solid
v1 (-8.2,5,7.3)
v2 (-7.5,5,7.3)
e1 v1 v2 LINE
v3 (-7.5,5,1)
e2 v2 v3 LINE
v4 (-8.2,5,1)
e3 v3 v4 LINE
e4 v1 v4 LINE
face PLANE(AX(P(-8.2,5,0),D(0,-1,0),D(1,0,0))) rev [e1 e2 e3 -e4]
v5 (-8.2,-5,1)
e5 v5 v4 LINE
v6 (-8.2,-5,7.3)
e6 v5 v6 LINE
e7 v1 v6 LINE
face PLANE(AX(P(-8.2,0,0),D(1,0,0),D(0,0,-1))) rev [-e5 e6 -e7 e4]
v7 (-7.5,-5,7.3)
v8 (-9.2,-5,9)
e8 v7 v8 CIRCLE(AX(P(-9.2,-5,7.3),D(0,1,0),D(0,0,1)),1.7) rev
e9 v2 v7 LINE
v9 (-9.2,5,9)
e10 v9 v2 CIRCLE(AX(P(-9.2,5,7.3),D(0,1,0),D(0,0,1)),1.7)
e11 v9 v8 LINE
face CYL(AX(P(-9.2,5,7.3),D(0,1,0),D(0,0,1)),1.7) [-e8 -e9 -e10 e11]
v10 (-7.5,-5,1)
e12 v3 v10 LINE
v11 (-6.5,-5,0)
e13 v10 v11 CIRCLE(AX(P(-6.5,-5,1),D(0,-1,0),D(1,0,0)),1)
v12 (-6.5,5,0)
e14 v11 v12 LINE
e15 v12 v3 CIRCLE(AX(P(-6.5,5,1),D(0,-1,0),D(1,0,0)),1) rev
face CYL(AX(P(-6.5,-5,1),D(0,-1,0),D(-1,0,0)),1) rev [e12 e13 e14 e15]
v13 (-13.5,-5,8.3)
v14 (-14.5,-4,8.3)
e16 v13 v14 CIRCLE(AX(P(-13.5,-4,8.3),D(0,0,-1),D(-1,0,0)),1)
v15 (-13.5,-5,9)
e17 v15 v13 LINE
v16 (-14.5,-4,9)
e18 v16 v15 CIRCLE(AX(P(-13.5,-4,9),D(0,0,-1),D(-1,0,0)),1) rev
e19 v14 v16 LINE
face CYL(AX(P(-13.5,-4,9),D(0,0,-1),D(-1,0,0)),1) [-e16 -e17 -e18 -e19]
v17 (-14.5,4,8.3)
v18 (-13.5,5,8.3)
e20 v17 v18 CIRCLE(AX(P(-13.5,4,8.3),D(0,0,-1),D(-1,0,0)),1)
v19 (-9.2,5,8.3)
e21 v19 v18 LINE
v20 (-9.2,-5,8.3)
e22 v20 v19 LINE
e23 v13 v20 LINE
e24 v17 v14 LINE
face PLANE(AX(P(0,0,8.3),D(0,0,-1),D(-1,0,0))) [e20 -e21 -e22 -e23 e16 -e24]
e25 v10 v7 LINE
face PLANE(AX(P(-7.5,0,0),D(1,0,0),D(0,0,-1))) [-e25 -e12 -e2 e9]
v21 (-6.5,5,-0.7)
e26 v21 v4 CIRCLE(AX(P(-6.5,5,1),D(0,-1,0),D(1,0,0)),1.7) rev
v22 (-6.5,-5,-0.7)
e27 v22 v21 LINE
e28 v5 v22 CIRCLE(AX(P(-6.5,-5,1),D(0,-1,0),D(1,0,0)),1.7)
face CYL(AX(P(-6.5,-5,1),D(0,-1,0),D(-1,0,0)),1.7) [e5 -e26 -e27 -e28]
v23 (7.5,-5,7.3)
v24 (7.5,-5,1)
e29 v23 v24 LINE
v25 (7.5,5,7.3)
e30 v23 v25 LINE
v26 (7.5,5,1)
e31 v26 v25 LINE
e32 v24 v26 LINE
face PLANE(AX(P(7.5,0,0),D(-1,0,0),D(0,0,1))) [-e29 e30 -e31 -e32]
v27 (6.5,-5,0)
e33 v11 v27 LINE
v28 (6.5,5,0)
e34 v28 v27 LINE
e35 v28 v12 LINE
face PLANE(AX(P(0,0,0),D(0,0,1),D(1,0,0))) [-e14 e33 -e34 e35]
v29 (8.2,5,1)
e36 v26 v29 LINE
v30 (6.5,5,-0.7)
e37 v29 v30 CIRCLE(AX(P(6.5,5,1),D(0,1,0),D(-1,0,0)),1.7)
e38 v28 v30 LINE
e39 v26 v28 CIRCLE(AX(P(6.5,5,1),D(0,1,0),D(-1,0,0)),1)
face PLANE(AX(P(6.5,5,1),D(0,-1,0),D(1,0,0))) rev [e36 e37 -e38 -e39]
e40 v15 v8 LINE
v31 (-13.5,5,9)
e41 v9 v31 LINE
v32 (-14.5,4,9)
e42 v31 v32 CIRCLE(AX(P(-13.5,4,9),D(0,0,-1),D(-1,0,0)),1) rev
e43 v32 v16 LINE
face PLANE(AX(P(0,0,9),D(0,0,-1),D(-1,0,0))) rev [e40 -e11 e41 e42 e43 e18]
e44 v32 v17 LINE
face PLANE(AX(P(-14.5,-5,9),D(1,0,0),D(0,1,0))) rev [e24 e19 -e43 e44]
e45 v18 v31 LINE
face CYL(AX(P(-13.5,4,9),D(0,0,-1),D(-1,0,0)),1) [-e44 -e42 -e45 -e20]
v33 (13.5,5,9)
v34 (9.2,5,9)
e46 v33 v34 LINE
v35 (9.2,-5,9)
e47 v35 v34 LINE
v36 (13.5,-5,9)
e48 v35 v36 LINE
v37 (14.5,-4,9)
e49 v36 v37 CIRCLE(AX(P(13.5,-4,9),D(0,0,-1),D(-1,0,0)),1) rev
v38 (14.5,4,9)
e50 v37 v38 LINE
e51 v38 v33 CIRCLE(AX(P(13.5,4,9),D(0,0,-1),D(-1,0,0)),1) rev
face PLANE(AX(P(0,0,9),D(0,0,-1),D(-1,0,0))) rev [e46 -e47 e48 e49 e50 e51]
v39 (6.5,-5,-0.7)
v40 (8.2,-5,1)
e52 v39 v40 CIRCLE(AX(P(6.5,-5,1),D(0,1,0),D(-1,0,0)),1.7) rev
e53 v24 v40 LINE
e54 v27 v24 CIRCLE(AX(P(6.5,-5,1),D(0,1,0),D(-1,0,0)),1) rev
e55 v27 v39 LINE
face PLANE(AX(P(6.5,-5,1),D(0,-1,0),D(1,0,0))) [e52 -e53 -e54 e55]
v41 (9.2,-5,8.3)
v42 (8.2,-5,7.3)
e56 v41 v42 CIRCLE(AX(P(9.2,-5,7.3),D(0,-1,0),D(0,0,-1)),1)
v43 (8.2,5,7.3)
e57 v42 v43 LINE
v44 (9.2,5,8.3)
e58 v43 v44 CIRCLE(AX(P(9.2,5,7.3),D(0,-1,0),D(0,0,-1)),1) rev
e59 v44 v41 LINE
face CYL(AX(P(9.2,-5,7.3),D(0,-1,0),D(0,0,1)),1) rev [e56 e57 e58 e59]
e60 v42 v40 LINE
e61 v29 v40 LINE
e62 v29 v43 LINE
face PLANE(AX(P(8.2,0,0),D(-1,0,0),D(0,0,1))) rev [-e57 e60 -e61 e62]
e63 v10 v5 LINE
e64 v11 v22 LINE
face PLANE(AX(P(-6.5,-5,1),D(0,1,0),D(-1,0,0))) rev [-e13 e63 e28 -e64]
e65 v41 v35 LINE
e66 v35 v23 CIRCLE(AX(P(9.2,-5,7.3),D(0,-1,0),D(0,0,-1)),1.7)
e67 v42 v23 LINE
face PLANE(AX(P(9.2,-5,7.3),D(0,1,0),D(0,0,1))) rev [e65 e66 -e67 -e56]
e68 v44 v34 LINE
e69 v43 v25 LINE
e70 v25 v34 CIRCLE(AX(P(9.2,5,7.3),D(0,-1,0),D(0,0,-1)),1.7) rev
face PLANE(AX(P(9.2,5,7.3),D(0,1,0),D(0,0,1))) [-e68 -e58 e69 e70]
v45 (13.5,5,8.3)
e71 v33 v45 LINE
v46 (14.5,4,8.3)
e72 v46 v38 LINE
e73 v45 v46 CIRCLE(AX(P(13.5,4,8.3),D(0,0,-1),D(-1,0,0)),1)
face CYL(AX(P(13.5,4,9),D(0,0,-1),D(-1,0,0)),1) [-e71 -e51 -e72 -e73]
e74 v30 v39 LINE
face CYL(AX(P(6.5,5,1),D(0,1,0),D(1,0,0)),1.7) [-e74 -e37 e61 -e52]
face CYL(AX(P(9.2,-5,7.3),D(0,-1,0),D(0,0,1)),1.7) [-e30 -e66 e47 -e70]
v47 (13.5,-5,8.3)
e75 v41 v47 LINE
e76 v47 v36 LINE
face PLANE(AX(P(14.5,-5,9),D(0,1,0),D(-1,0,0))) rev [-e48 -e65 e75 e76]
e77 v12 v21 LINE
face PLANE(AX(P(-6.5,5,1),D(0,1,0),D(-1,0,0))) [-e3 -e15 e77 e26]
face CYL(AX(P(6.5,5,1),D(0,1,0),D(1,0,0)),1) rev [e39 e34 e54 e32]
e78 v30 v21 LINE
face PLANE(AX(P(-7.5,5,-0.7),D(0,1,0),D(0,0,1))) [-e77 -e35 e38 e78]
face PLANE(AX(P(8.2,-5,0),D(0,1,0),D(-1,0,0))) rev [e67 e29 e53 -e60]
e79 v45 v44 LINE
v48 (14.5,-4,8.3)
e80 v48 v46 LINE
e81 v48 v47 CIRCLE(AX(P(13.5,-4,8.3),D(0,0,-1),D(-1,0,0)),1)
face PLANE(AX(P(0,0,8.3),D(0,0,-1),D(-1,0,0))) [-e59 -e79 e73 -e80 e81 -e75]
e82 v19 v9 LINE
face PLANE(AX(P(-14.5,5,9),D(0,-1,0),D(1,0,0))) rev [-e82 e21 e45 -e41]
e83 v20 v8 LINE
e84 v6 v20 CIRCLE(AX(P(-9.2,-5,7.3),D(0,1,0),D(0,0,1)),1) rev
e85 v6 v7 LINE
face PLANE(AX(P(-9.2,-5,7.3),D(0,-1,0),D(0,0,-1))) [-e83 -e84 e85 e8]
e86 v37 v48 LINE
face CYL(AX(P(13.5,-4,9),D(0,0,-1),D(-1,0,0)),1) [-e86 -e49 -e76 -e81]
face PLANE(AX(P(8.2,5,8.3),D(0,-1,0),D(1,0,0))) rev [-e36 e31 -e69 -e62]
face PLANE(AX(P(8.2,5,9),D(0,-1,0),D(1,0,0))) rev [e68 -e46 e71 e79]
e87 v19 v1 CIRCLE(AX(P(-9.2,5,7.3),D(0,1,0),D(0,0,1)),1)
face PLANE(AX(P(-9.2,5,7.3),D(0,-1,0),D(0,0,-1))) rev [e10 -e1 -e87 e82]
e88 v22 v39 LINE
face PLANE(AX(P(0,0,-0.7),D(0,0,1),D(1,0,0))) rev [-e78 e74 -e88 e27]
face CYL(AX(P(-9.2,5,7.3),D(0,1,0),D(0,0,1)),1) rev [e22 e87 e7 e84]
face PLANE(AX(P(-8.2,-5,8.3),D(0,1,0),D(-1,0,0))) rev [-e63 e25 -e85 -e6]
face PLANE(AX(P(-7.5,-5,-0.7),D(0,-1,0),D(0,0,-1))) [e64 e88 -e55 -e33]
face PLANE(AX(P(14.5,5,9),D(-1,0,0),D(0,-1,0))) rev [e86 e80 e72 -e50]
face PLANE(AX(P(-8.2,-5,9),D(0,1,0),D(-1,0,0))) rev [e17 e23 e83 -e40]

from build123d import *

# Parameters (mm, degrees)
SKETCH2_W                    = 15
SKETCH2_H                    = 10
BASE_FLANGE1_DEPTH           = 0.7
EDGE_FLANGE1_STRIP_W         = 4.8
EDGE_FLANGE1_STRIP_H         = 0.7
EDGE_FLANGE1_STRIP_CUT_DEPTH = 10
EDGE_FLANGE1_DEPTH           = 10
EDGE_FLANGE2_STRIP_W         = 4.8
EDGE_FLANGE2_STRIP_H         = 0.7
EDGE_FLANGE2_STRIP_CUT_DEPTH = 10
EDGE_FLANGE2_DEPTH           = 10
EDGE_FLANGE3_STRIP_W         = 4.8
EDGE_FLANGE3_STRIP_H         = 0.7
EDGE_FLANGE3_STRIP_CUT_DEPTH = 10
EDGE_FLANGE3_DEPTH           = 10
EDGE_FLANGE4_STRIP_W         = 4.8
EDGE_FLANGE4_STRIP_H         = 0.7
EDGE_FLANGE4_STRIP_CUT_DEPTH = 10
EDGE_FLANGE4_DEPTH           = 10
FILLET1_R                    = 1


# Sheet-metal steps are written as plain solids
with BuildPart() as part:
    # Sketch2 → Base-Flange1 (new body)
    with BuildSketch(Plane.XY):
        Rectangle(SKETCH2_W, SKETCH2_H)
    extrude(amount=-BASE_FLANGE1_DEPTH)

    # Edge-Flange1 strip (across the edge) → Edge-Flange1 strip cut (cut)
    with BuildSketch(Plane(origin=(-7.5, 5, 0), x_dir=(1, 0, 0), z_dir=(0, -1, 0))):
        with Locations((-1.4, -0.35)):
            Rectangle(EDGE_FLANGE1_STRIP_W, EDGE_FLANGE1_STRIP_H)
    extrude(amount=EDGE_FLANGE1_STRIP_CUT_DEPTH, mode=Mode.SUBTRACT)

    # Edge-Flange1 section (across the edge) → Edge-Flange1 (add)
    with BuildSketch(Plane(origin=(-7.5, 5, 0), x_dir=(1, 0, 0), z_dir=(0, -1, 0))):
        with BuildLine():
            Line((-0.7, 1), (-0.7, 8.3))
            Line((-0.7, 8.3), (0, 8.3))
            Line((0, 8.3), (0, 1))
            ThreePointArc((0, 1), (0.292893219, 0.292893219), (1, 0))
            Line((1, 0), (1, -0.7))
            ThreePointArc((1, -0.7), (-0.202081528, -0.202081528), (-0.7, 1))
        make_face()
    extrude(amount=EDGE_FLANGE1_DEPTH)

    # Edge-Flange2 strip (across the edge) → Edge-Flange2 strip cut (cut)
    with BuildSketch(Plane(origin=(7.5, -5, 0), x_dir=(-1, 0, 0), z_dir=(0, 1, 0))):
        with Locations((-1.4, -0.35)):
            Rectangle(EDGE_FLANGE2_STRIP_W, EDGE_FLANGE2_STRIP_H)
    extrude(amount=EDGE_FLANGE2_STRIP_CUT_DEPTH, mode=Mode.SUBTRACT)

    # Edge-Flange2 section (across the edge) → Edge-Flange2 (add)
    with BuildSketch(Plane(origin=(7.5, -5, 0), x_dir=(-1, 0, 0), z_dir=(0, 1, 0))):
        with BuildLine():
            Line((-0.7, 1), (-0.7, 8.3))
            Line((-0.7, 8.3), (0, 8.3))
            Line((0, 8.3), (0, 1))
            ThreePointArc((0, 1), (0.292893219, 0.292893219), (1, 0))
            Line((1, 0), (1, -0.7))
            ThreePointArc((1, -0.7), (-0.202081528, -0.202081528), (-0.7, 1))
        make_face()
    extrude(amount=EDGE_FLANGE2_DEPTH)

    # Edge-Flange3 strip (across the edge) → Edge-Flange3 strip cut (cut)
    with BuildSketch(Plane(origin=(8.2, 5, 8.3), x_dir=(0, 0, -1), z_dir=(0, -1, 0))):
        with Locations((-1.4, -0.35)):
            Rectangle(EDGE_FLANGE3_STRIP_W, EDGE_FLANGE3_STRIP_H)
    extrude(amount=EDGE_FLANGE3_STRIP_CUT_DEPTH, mode=Mode.SUBTRACT)

    # Edge-Flange3 section (across the edge) → Edge-Flange3 (add)
    with BuildSketch(Plane(origin=(8.2, 5, 8.3), x_dir=(0, 0, -1), z_dir=(0, -1, 0))):
        with BuildLine():
            Line((-0.7, 1), (-0.7, 6.3))
            Line((-0.7, 6.3), (0, 6.3))
            Line((0, 6.3), (0, 1))
            ThreePointArc((0, 1), (0.292893219, 0.292893219), (1, 0))
            Line((1, 0), (1, -0.7))
            ThreePointArc((1, -0.7), (-0.202081528, -0.202081528), (-0.7, 1))
        make_face()
    extrude(amount=EDGE_FLANGE3_DEPTH)

    # Edge-Flange4 strip (across the edge) → Edge-Flange4 strip cut (cut)
    with BuildSketch(Plane(origin=(-8.2, -5, 8.3), x_dir=(0, 0, -1), z_dir=(0, 1, 0))):
        with Locations((-1.4, -0.35)):
            Rectangle(EDGE_FLANGE4_STRIP_W, EDGE_FLANGE4_STRIP_H)
    extrude(amount=EDGE_FLANGE4_STRIP_CUT_DEPTH, mode=Mode.SUBTRACT)

    # Edge-Flange4 section (across the edge) → Edge-Flange4 (add)
    with BuildSketch(Plane(origin=(-8.2, -5, 8.3), x_dir=(0, 0, -1), z_dir=(0, 1, 0))):
        with BuildLine():
            Line((-0.7, 1), (-0.7, 6.3))
            Line((-0.7, 6.3), (0, 6.3))
            Line((0, 6.3), (0, 1))
            ThreePointArc((0, 1), (0.292893219, 0.292893219), (1, 0))
            Line((1, 0), (1, -0.7))
            ThreePointArc((1, -0.7), (-0.202081528, -0.202081528), (-0.7, 1))
        make_face()
    extrude(amount=EDGE_FLANGE4_DEPTH)

    # Fillet1
    fillet1_edges = [part.edges().sort_by_distance(p)[0] for p in [
        (14.5, -5, 8.65),
        (-14.5, -5, 8.65),
        (-14.5, 5, 8.65),
        (14.5, 5, 8.65),
    ]]
    fillet(fillet1_edges, radius=FILLET1_R)


solid = part.part
